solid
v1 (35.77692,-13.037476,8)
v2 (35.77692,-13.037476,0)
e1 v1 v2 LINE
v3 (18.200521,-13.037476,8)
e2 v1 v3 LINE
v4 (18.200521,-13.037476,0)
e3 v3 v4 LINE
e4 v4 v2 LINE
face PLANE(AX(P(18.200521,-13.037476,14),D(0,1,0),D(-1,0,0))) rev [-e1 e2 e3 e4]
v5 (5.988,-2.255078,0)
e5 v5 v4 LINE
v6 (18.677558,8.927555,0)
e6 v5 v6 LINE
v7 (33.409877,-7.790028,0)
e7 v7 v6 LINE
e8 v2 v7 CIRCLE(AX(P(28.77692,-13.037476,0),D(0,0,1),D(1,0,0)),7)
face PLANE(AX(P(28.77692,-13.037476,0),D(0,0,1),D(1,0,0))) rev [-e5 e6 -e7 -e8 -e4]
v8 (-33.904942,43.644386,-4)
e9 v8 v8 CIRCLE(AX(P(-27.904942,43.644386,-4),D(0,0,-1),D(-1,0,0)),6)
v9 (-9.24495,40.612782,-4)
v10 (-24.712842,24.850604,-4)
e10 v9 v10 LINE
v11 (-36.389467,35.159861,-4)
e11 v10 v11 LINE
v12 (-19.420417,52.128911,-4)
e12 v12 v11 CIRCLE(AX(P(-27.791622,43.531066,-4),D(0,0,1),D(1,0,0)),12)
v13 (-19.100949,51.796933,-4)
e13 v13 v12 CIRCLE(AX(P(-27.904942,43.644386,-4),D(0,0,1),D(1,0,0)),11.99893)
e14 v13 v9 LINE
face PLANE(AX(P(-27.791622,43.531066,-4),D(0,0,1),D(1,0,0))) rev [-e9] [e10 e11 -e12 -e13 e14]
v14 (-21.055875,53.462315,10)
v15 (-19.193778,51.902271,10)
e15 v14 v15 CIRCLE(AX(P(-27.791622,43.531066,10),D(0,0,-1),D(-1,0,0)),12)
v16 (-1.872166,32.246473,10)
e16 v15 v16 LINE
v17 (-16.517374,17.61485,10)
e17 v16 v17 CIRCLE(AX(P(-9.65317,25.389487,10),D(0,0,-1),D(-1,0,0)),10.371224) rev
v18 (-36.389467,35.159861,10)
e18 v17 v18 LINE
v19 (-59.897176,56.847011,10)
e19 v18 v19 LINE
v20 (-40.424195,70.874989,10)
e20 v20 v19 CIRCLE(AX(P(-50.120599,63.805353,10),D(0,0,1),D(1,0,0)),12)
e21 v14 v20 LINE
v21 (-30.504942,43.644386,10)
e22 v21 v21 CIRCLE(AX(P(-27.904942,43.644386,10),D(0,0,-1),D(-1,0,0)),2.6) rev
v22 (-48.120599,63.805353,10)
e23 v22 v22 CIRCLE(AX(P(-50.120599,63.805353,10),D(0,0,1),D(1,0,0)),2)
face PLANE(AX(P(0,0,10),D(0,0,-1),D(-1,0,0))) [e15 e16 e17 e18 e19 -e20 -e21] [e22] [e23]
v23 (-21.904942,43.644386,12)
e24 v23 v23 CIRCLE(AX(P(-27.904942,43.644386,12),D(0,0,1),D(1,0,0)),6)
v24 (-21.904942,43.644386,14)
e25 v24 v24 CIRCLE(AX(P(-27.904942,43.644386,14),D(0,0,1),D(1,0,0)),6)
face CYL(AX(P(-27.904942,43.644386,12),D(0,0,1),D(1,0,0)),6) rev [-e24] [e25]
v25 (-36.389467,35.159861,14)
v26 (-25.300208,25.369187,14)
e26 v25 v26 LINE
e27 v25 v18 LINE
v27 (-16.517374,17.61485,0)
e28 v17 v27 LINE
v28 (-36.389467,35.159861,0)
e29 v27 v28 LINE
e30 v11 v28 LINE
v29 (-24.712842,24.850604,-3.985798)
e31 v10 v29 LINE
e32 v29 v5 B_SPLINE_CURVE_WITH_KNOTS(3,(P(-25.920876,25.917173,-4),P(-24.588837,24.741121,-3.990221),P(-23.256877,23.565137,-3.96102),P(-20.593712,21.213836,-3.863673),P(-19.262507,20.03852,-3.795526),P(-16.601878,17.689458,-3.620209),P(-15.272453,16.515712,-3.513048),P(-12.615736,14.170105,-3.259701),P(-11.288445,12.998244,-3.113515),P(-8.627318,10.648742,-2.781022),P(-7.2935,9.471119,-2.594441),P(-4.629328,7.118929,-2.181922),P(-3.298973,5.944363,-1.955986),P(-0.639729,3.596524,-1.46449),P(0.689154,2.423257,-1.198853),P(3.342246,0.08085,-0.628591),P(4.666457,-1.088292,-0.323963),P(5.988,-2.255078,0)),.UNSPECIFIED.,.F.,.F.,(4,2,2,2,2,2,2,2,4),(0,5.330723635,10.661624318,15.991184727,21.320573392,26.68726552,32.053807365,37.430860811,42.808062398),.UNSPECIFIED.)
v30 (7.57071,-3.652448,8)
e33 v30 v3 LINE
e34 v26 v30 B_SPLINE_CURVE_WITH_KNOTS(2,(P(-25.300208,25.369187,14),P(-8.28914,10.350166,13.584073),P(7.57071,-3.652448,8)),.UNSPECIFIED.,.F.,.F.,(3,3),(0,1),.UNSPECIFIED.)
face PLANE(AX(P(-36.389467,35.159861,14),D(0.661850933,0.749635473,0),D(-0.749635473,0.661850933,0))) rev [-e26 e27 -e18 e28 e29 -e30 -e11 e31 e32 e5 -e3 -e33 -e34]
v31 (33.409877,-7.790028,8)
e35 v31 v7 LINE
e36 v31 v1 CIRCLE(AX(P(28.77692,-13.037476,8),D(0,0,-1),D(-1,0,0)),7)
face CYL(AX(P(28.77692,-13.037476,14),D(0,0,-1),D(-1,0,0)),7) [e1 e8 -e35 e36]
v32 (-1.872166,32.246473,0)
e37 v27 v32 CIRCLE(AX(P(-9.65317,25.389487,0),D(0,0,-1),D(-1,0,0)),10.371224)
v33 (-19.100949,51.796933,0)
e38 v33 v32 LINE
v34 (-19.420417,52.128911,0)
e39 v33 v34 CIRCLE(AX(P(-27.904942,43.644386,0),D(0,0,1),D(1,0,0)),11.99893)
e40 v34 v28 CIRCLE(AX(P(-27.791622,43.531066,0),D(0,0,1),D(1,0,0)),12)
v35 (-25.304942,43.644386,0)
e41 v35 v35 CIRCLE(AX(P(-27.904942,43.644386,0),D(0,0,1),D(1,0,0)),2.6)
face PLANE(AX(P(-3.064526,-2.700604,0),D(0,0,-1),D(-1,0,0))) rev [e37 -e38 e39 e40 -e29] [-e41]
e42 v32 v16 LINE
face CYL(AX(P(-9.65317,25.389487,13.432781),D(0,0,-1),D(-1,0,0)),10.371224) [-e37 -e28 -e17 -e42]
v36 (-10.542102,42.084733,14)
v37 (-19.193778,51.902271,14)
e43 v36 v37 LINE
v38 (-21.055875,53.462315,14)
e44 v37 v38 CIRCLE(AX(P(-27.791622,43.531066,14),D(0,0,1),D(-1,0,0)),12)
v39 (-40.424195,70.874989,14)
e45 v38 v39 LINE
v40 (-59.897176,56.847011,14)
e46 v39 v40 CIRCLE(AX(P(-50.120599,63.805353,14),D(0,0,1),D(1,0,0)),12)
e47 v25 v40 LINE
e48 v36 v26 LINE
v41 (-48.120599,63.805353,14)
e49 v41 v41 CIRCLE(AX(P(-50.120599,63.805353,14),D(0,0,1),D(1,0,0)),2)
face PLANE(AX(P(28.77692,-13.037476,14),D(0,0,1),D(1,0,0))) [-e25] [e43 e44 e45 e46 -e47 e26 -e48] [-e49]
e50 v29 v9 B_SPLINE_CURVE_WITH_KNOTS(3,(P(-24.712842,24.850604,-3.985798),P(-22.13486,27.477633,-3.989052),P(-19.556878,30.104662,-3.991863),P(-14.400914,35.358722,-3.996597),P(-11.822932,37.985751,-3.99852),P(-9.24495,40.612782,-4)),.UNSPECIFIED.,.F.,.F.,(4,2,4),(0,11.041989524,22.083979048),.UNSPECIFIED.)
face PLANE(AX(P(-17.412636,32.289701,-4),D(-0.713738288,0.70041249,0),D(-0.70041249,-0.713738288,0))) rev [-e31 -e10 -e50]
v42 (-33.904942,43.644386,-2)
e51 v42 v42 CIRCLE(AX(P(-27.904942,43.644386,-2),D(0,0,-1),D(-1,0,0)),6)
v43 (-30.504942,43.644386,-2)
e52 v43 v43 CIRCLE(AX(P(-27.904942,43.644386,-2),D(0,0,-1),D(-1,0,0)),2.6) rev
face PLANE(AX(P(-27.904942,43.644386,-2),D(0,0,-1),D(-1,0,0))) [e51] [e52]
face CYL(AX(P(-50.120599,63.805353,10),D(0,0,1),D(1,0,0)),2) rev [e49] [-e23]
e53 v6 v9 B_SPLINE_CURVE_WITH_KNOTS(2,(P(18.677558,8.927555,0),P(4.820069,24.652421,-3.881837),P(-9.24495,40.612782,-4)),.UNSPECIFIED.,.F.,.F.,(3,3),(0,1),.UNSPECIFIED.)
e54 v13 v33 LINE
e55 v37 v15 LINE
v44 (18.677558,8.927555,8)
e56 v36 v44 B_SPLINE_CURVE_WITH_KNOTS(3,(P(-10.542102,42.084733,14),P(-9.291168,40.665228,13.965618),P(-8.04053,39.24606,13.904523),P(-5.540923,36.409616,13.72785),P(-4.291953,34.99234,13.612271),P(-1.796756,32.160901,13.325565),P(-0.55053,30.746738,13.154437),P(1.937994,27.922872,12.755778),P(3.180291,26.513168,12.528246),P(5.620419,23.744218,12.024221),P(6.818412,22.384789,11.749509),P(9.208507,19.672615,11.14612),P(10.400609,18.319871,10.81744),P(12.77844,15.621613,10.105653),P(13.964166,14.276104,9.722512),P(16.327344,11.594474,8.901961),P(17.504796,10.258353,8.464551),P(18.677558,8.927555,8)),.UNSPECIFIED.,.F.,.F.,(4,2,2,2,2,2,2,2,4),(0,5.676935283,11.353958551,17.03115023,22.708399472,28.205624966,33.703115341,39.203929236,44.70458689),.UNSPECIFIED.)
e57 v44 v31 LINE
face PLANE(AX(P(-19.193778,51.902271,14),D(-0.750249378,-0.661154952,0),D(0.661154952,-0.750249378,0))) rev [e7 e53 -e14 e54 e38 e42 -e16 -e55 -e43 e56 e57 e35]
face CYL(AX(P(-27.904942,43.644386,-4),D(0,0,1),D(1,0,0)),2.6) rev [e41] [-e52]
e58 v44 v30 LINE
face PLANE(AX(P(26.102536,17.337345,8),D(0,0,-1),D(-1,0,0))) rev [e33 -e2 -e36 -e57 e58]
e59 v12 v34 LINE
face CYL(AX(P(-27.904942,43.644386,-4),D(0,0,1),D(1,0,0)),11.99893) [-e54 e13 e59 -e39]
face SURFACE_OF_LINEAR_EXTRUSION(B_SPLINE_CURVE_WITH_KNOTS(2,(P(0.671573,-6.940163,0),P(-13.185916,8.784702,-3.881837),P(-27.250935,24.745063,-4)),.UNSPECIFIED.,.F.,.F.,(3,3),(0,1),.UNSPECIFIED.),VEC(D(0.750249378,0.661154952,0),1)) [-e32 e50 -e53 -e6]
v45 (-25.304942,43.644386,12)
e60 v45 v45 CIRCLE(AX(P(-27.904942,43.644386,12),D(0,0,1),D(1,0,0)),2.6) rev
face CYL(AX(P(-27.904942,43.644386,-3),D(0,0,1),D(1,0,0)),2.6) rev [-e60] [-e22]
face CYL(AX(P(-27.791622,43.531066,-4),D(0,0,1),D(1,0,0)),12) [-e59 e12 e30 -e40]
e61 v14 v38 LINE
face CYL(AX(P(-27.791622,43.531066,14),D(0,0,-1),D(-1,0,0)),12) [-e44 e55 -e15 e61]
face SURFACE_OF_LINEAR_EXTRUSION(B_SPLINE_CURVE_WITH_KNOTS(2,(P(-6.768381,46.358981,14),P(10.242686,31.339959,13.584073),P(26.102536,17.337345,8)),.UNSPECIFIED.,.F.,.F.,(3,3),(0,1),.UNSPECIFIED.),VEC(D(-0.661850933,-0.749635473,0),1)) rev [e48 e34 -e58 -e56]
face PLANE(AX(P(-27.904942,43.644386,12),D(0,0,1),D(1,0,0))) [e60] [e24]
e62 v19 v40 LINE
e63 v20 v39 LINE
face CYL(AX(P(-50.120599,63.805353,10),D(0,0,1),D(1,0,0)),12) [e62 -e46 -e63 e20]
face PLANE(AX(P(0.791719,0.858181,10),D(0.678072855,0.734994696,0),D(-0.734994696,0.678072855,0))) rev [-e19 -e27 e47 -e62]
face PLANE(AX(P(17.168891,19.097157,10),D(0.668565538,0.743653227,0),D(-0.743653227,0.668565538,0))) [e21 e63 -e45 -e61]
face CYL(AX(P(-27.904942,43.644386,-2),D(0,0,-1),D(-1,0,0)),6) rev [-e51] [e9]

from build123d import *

# Parameters (mm, degrees)
BOSS_EXTRUDE1_DEPTH = 14
CUT_EXTRUDE1_DEPTH  = 17
CUT_EXTRUDE3_DEPTH  = 10
CUT_EXTRUDE5_DEPTH  = 28.00000000000001
BOSS_EXTRUDE2_START = 10
SKETCH7_R           = 2.599999999999999
BOSS_EXTRUDE2_DEPTH = 4
BOSS_EXTRUDE3_DEPTH = 24.000000000000014
CUT_EXTRUDE6_DEPTH  = 24.000000000000014
FILLET3_R           = 10.371224
SKETCH11_R          = 2.0000000000000036
BOSS_EXTRUDE4_DEPTH = 4.0000000000000036
SKETCH12_R          = 5.999999999999998
CUT_EXTRUDE7_DEPTH  = 2
CUT_EXTRUDE8_START  = -2
SKETCH13_R          = 6.000000000000001
CUT_EXTRUDE8_DEPTH  = 2


with BuildPart() as part:
    # Sketch1 → Boss-Extrude1 (new body)
    with BuildSketch(Plane.XY):
        with BuildLine():
            Line((-36.38946679579018, 35.15986129833476), (18.20052051694879, -13.03747639081095))
            Line((18.20052051694879, -13.03747639081095), (35.77692020217122, -13.037476390810937))
            ThreePointArc((35.77692020217122, -13.037476390810937), (35.15777812721451, -10.159169225075718), (33.40987673348322, -7.79002807961883))
            Line((33.40987673348322, -7.79002807961883), (-19.19377778956647, 51.90227090989418))
            ThreePointArc((-19.19377778956647, 51.90227090989418), (-36.16282709845803, 52.12891060722632), (-36.38946679579018, 35.15986129833476))
        make_face()
    extrude(amount=BOSS_EXTRUDE1_DEPTH)

    # Sketch2 → Cut-Extrude1 (cut)
    with BuildSketch(Plane.XY.offset(14)):
        with BuildLine():
            ThreePointArc((-26.066464510259447, 45.48286358386564), (-29.74341977242946, 45.48286358386556), (-29.74341977242945, 41.80590832169555))
            Line((-29.74341977242943, 41.80590832169553), (-26.066464510259397, 45.48286358386558))
        make_face()
        with BuildLine():
            Line((-26.066464510259397, 45.48286358386558), (-29.74341977242943, 41.80590832169553))
            ThreePointArc((-29.74341977242945, 41.805908321695554), (-26.90996521719519, 41.24229916825121), (-25.304942141344416, 43.64438595278056))
            ThreePointArc((-25.304942141344416, 43.64438595278056), (-25.502855356815083, 44.63936287692983), (-26.066464510259447, 45.48286358386564))
        make_face()
    extrude(amount=-CUT_EXTRUDE1_DEPTH, mode=Mode.SUBTRACT)

    # Sketch3 → Cut-Extrude3 (cut)
    with BuildSketch(Plane(origin=(0, 0, 0), x_dir=(-1, 0, 0), z_dir=(0, 0, -1))):
        Polygon((9.244950076252596, 40.61278154184911), (25.60190789451236, 23.944622093291866), (43.70935849975749, 23.944622093291866), (43.70935849975749, 56.22709716223903), (9.244950076252595, 56.22709716223903), align=None)
    extrude(amount=-CUT_EXTRUDE3_DEPTH, mode=Mode.SUBTRACT)

    # Sketch4 → Cut-Extrude5 (cut)
    with BuildSketch(Plane(origin=(1.5041731974177077, 1.7036790764832412, 0), x_dir=(0.7496354730351515, -0.6618509330410925, 0), z_dir=(-0.6618509330410925, -0.7496354730351515, 0))):
        with BuildLine():
            Line((8.092649067523661, 8), (43.108918661974144, 8))
            Line((43.108918661974144, 8), (43.108918661974144, 14))
            Line((43.108918661974144, 14), (-35.75655339767276, 14))
            add(Edge.make_bspline(
                [(8.092649067523661, 8), (-13.064100153172822, 13.584073422401662), (-35.75655339767276, 14)],
                knots=[0, 0, 0, 1, 1, 1], degree=2))
        make_face()
    extrude(amount=-CUT_EXTRUDE5_DEPTH, mode=Mode.SUBTRACT)



with BuildPart() as body_2:
    # Sketch7 → Boss-Extrude2 (new body)
    with BuildSketch(Plane(origin=(0, 0, 10), x_dir=(-1, 0, 0), z_dir=(0, 0, -1)).offset(BOSS_EXTRUDE2_START)):
        with BuildLine():
            Line((9.244950076252595, 40.61278154184911), (24.71284152511152, 24.85060352151197))
            Line((24.71284152511152, 24.85060352151197), (35.272794661727836, 34.17395478721706))
            Line((35.272794661727836, 34.17395478721706), (36.38946679579018, 35.15986129833476))
            ThreePointArc((36.38946679579018, 35.15986129833476), (36.27690366691708, 52.016347478352856), (19.420417486898984, 52.12891060722668))
            ThreePointArc((19.420417486898984, 52.128910607226686), (19.259089791001077, 51.96445532507904), (19.10094915036315, 51.79693307859034))
            Line((19.10094915036315, 51.79693307859034), (18.710021655268264, 51.3533258590539))
            Line((18.710021655268264, 51.3533258590539), (9.244950076252596, 40.61278154184911))
        make_face()
        with Locations(Location((27.904942141344414, 43.64438595278056, 0), (0, 0, 180))):
            Circle(SKETCH7_R, mode=Mode.SUBTRACT)
    extrude(amount=BOSS_EXTRUDE2_DEPTH)


with BuildPart() as part_1:
    add(part.part)

    add(body_2.part)  # Boss-Extrude3 merges body 2
    # Sketch9 → Boss-Extrude3 (add)
    with BuildSketch(Plane(origin=(14.941459139681696, 13.167114819822281, 0), x_dir=(0, 0, -1), z_dir=(0.7502493779859964, 0.6611549522098625, 0))):
        with BuildLine():
            Line((0, 36.582058615900806), (0, -5.650867010397978))
            add(Edge.make_bspline(
                [(0, -5.650867010397978), (3.8818367436513204, 15.308651069653255), (4, 36.582058615900806)],
                knots=[0, 0, 0, 1, 1, 1], degree=2))
            Line((4, 36.582058615900806), (0, 36.582058615900806))
        make_face()
    extrude(amount=-BOSS_EXTRUDE3_DEPTH)

    # Sketch10 → Cut-Extrude6 (cut)
    with BuildSketch(Plane.XY):
        Polygon((-25.92087579699025, 25.91717339280068), (6.581343150758677, -2.7789391982650153), (-1.9207549102098282, -11.21281031813962), (-35.1442259060093, 19.61838673287275), align=None)
    extrude(amount=-CUT_EXTRUDE6_DEPTH, mode=Mode.SUBTRACT)

    # Fillet3
    fillet3_edges = [part_1.edges().sort_by_distance(p)[0] for p in [
        (-24.712841525111525, 24.85060352151197, 5),
        (-9.244950076252596, 40.61278154184911, 5),
    ]]
    fillet(fillet3_edges, radius=FILLET3_R - 0.0001)  # a hair under: the kernel refuses the full size

    # Sketch11 → Boss-Extrude4 (add)
    with BuildSketch(Plane.XY.offset(14)):
        with BuildLine():
            Line((-56.27002242528391, 53.500762526462196), (-36.38946679579018, 35.15986129833476))
            Line((-36.38946679579018, 35.15986129833476), (-31.30885180689802, 50.34187338631568))
            Line((-31.30885180689802, 50.34187338631568), (-18.71002165526834, 51.353325859054))
            Line((-18.71002165526834, 51.353325859054), (-40.42419503361445, 70.87498928012118))
            ThreePointArc((-40.42419503361445, 70.87498928012118), (-57.13470265149496, 73.54200286861439), (-59.89717634802535, 56.84701064326646))
            Line((-59.89717634802535, 56.84701064326646), (-56.27002242528391, 53.500762526462196))
        make_face()
        with Locations((-50.120598780049356, 63.8053531942874)):
            Circle(SKETCH11_R, mode=Mode.SUBTRACT)
    extrude(amount=-BOSS_EXTRUDE4_DEPTH)

    # Sketch12 → Cut-Extrude7 (cut)
    with BuildSketch(Plane(origin=(0, 0, -4), x_dir=(-1, 0, 0), z_dir=(0, 0, -1))):
        with Locations((27.904942141344414, 43.64438595278056)):
            Circle(SKETCH12_R)
    extrude(amount=-CUT_EXTRUDE7_DEPTH, mode=Mode.SUBTRACT)

    # Sketch13 → Cut-Extrude8 (cut)
    with BuildSketch(Plane.XY.offset(14).offset(CUT_EXTRUDE8_START)):
        with Locations(Location((-27.904942141344414, 43.64438595278056, 0), (0, 0, 180))):
            Circle(SKETCH13_R)
    extrude(amount=CUT_EXTRUDE8_DEPTH, mode=Mode.SUBTRACT)


solid = part_1.part
